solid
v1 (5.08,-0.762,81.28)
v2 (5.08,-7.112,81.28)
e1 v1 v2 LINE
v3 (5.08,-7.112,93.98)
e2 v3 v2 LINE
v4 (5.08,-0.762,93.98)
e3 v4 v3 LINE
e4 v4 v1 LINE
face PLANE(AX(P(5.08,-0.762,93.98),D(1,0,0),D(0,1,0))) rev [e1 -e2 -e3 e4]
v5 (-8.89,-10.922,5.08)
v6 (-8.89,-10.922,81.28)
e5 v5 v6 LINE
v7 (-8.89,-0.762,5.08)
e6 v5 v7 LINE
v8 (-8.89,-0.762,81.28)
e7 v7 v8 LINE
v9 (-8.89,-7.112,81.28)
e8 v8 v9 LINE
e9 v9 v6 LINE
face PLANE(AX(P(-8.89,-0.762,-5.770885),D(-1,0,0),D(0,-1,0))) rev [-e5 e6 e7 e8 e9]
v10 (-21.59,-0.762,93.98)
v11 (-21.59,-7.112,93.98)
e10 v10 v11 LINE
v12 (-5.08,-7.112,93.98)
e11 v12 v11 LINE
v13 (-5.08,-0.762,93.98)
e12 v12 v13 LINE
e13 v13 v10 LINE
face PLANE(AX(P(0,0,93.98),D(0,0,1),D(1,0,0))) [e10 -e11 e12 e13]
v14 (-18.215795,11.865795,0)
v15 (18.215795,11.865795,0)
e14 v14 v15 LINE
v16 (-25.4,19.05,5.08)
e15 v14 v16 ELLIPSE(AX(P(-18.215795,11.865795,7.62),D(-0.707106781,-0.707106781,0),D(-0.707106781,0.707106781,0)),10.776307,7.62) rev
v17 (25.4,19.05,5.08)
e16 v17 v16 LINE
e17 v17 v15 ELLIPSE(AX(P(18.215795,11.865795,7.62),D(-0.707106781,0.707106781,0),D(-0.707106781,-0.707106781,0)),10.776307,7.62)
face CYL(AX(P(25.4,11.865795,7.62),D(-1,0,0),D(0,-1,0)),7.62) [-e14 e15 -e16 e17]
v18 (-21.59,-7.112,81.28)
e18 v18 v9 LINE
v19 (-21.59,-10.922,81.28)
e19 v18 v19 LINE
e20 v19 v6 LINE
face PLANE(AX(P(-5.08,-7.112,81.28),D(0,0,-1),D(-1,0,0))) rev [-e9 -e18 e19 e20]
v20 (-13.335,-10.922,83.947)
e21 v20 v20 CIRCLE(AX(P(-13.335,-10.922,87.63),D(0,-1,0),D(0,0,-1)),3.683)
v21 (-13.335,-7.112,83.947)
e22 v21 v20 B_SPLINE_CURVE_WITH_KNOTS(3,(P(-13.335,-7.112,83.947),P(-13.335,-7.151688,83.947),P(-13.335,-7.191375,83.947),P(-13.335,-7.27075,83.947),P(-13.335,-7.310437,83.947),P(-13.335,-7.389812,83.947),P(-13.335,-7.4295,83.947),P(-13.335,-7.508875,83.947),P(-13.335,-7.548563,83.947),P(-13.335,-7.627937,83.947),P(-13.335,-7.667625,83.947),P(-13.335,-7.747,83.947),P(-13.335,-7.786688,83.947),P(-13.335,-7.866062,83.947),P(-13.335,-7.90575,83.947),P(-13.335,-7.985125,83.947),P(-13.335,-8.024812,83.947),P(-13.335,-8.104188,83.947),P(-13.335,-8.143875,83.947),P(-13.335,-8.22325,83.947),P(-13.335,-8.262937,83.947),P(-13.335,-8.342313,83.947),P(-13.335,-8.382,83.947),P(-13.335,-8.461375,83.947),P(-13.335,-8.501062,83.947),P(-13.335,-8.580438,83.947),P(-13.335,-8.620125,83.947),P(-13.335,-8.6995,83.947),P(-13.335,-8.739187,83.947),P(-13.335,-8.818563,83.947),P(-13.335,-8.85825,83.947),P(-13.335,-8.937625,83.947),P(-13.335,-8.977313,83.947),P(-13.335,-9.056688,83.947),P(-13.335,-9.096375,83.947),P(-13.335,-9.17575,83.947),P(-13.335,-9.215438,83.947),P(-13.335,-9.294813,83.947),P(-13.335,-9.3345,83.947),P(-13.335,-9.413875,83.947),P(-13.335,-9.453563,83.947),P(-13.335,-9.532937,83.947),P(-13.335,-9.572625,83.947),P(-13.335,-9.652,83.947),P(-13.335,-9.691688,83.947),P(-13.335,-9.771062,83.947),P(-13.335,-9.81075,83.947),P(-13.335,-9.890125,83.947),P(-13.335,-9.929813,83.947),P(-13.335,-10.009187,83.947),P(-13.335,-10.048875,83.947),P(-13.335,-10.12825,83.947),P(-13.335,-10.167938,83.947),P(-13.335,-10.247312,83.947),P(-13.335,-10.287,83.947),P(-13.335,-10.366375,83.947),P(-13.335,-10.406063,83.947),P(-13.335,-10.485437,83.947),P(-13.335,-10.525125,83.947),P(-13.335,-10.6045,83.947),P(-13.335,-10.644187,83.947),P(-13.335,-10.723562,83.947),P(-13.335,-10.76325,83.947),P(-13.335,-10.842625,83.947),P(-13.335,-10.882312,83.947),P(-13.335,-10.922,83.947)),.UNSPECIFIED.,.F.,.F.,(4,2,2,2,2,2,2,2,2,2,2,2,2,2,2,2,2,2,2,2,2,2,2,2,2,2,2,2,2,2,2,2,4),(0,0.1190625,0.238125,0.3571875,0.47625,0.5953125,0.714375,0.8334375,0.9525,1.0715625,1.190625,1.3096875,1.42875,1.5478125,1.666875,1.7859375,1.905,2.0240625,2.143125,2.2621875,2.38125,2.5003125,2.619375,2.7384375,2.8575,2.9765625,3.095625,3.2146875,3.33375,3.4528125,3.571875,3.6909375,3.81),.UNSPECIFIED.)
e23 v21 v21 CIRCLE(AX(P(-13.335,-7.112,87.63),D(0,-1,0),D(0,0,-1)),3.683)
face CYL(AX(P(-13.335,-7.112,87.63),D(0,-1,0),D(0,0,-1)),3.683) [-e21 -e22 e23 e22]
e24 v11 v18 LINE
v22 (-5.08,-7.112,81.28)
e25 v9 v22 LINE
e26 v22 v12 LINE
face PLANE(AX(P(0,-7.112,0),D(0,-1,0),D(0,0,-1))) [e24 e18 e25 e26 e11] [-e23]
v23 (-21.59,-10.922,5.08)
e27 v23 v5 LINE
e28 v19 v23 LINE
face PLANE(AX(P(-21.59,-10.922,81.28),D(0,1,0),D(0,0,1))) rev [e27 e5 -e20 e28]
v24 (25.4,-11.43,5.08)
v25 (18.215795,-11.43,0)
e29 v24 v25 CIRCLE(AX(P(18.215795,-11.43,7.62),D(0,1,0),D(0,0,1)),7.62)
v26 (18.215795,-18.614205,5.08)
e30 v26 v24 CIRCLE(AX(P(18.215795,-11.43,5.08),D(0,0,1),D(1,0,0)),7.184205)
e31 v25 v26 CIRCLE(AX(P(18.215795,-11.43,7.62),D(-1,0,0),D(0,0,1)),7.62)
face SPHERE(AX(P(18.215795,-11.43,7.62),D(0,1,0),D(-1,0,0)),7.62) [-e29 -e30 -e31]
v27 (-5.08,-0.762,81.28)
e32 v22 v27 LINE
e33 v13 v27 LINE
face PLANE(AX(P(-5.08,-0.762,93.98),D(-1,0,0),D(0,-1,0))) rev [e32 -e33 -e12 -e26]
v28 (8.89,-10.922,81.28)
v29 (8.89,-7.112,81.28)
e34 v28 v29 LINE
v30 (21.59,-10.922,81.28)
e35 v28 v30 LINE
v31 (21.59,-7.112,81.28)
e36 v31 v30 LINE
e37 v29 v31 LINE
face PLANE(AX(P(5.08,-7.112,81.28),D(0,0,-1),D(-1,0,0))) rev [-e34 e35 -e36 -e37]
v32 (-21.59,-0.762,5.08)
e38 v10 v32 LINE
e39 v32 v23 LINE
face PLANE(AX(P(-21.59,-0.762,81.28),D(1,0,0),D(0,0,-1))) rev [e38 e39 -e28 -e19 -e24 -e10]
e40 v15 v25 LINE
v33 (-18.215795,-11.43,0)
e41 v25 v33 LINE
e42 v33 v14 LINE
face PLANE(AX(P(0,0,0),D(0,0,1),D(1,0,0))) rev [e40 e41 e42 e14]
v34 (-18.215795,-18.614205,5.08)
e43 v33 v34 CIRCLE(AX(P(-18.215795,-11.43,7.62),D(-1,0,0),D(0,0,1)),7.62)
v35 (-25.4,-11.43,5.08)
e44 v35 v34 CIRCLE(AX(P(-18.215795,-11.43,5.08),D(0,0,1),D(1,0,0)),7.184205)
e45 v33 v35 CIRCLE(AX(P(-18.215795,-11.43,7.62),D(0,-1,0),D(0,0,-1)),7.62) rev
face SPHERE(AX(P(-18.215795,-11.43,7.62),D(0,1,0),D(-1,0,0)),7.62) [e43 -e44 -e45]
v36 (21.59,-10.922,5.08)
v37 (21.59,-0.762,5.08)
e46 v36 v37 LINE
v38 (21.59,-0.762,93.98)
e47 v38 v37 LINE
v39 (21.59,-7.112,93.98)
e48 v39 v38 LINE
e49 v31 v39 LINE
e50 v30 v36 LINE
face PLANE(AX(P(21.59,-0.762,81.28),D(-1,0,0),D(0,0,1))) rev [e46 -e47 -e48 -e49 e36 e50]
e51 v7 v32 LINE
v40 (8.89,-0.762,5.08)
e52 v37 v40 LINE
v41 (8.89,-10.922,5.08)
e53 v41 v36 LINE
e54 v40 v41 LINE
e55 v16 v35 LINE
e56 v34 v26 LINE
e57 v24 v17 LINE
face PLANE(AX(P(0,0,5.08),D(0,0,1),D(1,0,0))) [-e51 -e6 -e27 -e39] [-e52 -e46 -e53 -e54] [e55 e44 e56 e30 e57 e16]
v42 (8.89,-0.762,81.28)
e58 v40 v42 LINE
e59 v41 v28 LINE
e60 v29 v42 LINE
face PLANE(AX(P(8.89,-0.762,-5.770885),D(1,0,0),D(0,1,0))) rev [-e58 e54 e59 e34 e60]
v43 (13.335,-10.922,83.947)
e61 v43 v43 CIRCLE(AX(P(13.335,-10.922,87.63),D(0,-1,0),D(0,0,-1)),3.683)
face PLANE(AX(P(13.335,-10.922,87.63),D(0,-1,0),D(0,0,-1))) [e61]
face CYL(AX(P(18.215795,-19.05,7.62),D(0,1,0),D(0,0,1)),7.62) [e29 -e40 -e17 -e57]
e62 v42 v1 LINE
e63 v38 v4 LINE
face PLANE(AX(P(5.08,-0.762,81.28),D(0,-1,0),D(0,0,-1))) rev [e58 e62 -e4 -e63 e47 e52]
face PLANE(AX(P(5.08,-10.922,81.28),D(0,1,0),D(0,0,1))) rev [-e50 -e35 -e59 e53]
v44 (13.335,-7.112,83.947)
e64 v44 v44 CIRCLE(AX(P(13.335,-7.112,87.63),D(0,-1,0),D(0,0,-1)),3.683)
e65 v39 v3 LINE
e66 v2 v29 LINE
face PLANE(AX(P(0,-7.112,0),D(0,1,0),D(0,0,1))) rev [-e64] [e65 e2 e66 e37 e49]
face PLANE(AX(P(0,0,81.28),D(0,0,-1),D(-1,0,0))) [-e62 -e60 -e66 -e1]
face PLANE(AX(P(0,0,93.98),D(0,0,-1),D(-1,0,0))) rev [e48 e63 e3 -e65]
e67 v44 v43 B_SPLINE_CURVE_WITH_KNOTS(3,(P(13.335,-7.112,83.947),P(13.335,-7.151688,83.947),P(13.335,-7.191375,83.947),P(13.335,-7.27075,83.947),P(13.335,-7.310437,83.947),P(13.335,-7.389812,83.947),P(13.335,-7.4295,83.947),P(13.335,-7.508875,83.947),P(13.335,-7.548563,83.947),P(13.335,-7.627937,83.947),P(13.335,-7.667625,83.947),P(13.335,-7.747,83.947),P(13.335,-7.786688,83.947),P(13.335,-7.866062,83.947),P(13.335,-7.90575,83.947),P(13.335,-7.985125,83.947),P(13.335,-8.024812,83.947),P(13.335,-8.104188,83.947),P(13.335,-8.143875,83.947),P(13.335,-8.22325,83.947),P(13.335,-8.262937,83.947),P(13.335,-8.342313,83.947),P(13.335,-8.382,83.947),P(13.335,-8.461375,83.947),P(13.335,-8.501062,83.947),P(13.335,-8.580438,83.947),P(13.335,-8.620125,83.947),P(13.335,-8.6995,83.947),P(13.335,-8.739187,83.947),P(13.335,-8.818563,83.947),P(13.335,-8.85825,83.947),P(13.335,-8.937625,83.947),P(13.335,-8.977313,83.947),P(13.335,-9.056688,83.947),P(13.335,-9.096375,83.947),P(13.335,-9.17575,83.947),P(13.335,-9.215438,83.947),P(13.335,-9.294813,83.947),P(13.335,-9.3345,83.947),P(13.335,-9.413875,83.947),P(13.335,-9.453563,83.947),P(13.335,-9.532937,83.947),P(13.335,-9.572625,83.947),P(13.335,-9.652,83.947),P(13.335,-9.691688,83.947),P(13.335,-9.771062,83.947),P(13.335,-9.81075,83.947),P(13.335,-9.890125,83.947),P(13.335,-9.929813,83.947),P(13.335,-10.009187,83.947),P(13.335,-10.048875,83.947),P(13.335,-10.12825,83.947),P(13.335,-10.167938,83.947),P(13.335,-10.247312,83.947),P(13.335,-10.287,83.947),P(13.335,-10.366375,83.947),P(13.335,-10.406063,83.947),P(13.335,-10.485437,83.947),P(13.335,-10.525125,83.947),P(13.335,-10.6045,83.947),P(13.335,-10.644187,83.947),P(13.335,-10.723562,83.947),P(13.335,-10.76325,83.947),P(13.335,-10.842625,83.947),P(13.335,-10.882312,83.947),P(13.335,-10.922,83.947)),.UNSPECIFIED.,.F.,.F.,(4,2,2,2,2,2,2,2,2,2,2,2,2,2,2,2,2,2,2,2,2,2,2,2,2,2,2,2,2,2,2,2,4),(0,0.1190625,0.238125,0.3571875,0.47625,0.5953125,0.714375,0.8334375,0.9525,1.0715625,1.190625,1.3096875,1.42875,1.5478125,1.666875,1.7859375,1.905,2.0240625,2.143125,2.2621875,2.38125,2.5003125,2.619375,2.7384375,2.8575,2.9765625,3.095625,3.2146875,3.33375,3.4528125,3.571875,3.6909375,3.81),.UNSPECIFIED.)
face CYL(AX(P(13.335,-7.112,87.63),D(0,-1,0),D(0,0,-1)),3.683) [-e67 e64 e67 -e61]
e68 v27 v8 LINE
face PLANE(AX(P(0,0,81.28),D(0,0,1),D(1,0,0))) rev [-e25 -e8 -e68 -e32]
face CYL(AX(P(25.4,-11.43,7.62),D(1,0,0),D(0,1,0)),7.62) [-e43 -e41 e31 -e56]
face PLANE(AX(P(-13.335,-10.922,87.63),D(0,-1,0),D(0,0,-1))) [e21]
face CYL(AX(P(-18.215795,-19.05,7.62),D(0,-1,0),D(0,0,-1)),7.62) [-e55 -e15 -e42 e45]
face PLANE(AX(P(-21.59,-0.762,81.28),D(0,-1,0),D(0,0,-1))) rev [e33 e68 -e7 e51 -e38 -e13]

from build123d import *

# Parameters (mm, degrees)
SKETCH1_W           = 50.8
SKETCH1_H           = 38.1
BOSS_EXTRUDE1_DEPTH = 5.08
SKETCH2_W           = 16.51
SKETCH2_H           = 10.16
BOSS_EXTRUDE2_DEPTH = 76.2
SKETCH3_W           = 3.81
SKETCH3_H           = 10.16
CUT_EXTRUDE1_DEPTH  = 76.2
SKETCH4_W           = 16.51
SKETCH4_H           = 10.16
BOSS_EXTRUDE3_DEPTH = 12.7
SKETCH6_W           = 16.51
SKETCH6_H           = 12.7
CUT_EXTRUDE2_DEPTH  = 3.81
SKETCH5_R           = 3.683
BOSS_EXTRUDE4_DEPTH = 3.81
FILLET1_R           = 7.62
FILLET4_R           = 7.62
FILLET7_R           = 7.62


with BuildPart() as part:
    # Sketch1 → Boss-Extrude1 (new body)
    with BuildSketch(Plane.XY):
        Rectangle(SKETCH1_W, SKETCH1_H)
    extrude(amount=BOSS_EXTRUDE1_DEPTH)

    # Sketch2 → Boss-Extrude2 (add)
    with BuildSketch(Plane.XY.offset(5.08)):
        with Locations((-13.335, -5.842)):
            Rectangle(SKETCH2_W, SKETCH2_H)
        with Locations((13.335, -5.842)):
            Rectangle(SKETCH2_W, SKETCH2_H)
    extrude(amount=BOSS_EXTRUDE2_DEPTH)

    # Sketch3 → Cut-Extrude1 (cut)
    with BuildSketch(Plane.XY.offset(81.28)):
        with Locations((-6.985, -5.842)):
            Rectangle(SKETCH3_W, SKETCH3_H)
        with Locations((6.985, -5.842)):
            Rectangle(SKETCH3_W, SKETCH3_H)
    extrude(amount=-CUT_EXTRUDE1_DEPTH, mode=Mode.SUBTRACT)

    # Sketch4 → Boss-Extrude3 (add)
    with BuildSketch(Plane.XY.offset(81.28)):
        with Locations((-13.335, -5.842)):
            Rectangle(SKETCH4_W, SKETCH4_H)
        with Locations((13.335, -5.842)):
            Rectangle(SKETCH4_W, SKETCH4_H)
    extrude(amount=BOSS_EXTRUDE3_DEPTH)

    # Sketch6 → Cut-Extrude2 (cut)
    with BuildSketch(Plane.XZ.offset(10.922)):
        with Locations((-13.335, 87.63)):
            Rectangle(SKETCH6_W, SKETCH6_H)
        with Locations((13.335, 87.63)):
            Rectangle(SKETCH6_W, SKETCH6_H)
    extrude(amount=-CUT_EXTRUDE2_DEPTH, mode=Mode.SUBTRACT)

    # Sketch5 → Boss-Extrude4 (add)
    with BuildSketch(Plane.XZ.offset(10.922)):
        with Locations(Location((-13.335, 87.63, 0), (0, 0, 270))):
            Circle(SKETCH5_R)
        with Locations(Location((13.335, 87.63, 0), (0, 0, 270))):
            Circle(SKETCH5_R)
    extrude(amount=-BOSS_EXTRUDE4_DEPTH)

    # Fillet1
    # the kernel refuses this fillet: 7.62 mm, written as the material it takes off along each edge
    with BuildSketch(Plane(origin=(-43.360512242, 19.05, 0), x_dir=(0, -1, 0), z_dir=(1, 0, 0))) as fillet1_piece_1:
        with BuildLine():
            CenterArc((7.184204897, -7.62), FILLET1_R, 90, 70.528779366)
            Line((0, -5.08), (-0.143684098, -5.0292))
            ThreePointArc((-0.143684098, -5.0292), (-0.1524, -2.54), (-0.1524, 0))
            Line((-0.1524, 0), (0, 0.1524))
            Line((0, 0.1524), (7.184204897, 0.1524))
            Line((7.184204897, 0.1524), (7.184204897, 0))
        make_face()
    extrude(amount=86.721024484, mode=Mode.SUBTRACT)

    # Fillet4
    # the kernel refuses this fillet: 7.62 mm, written as the material it takes off along each edge
    with BuildSketch(Plane(origin=(-25.4, -37.010512242, 0), x_dir=(0, 0, 1), z_dir=(0, 1, 0)), Plane(origin=(25.4, 29.826307345, 0), x_dir=(0, 0, 1), z_dir=(0, -1, 0))) as fillet4_piece_1:
        with BuildLine():
            CenterArc((7.62, 7.184204897), FILLET4_R, 180, 70.528779366)
            Line((0, 7.184204897), (-0.1524, 7.184204897))
            Line((-0.1524, 7.184204897), (-0.1524, 0))
            Line((-0.1524, 0), (0, -0.1524))
            ThreePointArc((0, -0.1524), (2.54, -0.1524), (5.0292, -0.143684098))
            Line((5.0292, -0.143684098), (5.08, 0))
        make_face()
    extrude(amount=66.836819587, mode=Mode.SUBTRACT)

    # Fillet7
    # the kernel refuses this fillet: 7.62 mm, written as the material it takes off along each edge
    with BuildSketch(Plane(origin=(-18.215795103, -19.05, 7.62), x_dir=(0.5563472554155052, 0, 0.8309498970405103), z_dir=(0.8309498970405103, 0, -0.5563472554155052))) as fillet7_piece_1:
        with BuildLine():
            CenterArc((7.62 - FILLET7_R, -FILLET7_R), FILLET7_R, 0, 90)
            Line((7.62, -FILLET7_R), (7.62, 0))
            Line((7.62, 0), (7.62 - FILLET7_R, 0))
        make_face()
    revolve(axis=Axis((-18.215795103, -19.05, 7.62), (0, -1, 0)), revolution_arc=213.803560609, mode=Mode.SUBTRACT)
    with BuildSketch(Plane(origin=(18.215795103, -19.05, 7.62), x_dir=(-0.5563472554155037, 0, 0.8309498970405114), z_dir=(-0.8309498970405114, 0, -0.5563472554155037))) as fillet7_piece_2:
        with BuildLine():
            CenterArc((7.62 - FILLET7_R, FILLET7_R), FILLET7_R, 270, 90)
            Line((7.62, FILLET7_R), (7.62, 0))
            Line((7.62, 0), (7.62 - FILLET7_R, 0))
        make_face()
    revolve(axis=Axis((18.215795103, -19.05, 7.62), (0, 1, 0)), revolution_arc=213.803560609, mode=Mode.SUBTRACT)
    with BuildSketch(Plane(origin=(18.215795103, -19.05, 0), x_dir=(0, 0, 1), z_dir=(-1, 0, 0))) as fillet7_piece_3:
        with BuildLine():
            CenterArc((FILLET7_R, FILLET7_R), FILLET7_R, 180, 90)
            Line((0, FILLET7_R), (0, 0))
            Line((0, 0), (FILLET7_R, 0))
        make_face()
    extrude(amount=36.431590206, mode=Mode.SUBTRACT)


solid = part.part
